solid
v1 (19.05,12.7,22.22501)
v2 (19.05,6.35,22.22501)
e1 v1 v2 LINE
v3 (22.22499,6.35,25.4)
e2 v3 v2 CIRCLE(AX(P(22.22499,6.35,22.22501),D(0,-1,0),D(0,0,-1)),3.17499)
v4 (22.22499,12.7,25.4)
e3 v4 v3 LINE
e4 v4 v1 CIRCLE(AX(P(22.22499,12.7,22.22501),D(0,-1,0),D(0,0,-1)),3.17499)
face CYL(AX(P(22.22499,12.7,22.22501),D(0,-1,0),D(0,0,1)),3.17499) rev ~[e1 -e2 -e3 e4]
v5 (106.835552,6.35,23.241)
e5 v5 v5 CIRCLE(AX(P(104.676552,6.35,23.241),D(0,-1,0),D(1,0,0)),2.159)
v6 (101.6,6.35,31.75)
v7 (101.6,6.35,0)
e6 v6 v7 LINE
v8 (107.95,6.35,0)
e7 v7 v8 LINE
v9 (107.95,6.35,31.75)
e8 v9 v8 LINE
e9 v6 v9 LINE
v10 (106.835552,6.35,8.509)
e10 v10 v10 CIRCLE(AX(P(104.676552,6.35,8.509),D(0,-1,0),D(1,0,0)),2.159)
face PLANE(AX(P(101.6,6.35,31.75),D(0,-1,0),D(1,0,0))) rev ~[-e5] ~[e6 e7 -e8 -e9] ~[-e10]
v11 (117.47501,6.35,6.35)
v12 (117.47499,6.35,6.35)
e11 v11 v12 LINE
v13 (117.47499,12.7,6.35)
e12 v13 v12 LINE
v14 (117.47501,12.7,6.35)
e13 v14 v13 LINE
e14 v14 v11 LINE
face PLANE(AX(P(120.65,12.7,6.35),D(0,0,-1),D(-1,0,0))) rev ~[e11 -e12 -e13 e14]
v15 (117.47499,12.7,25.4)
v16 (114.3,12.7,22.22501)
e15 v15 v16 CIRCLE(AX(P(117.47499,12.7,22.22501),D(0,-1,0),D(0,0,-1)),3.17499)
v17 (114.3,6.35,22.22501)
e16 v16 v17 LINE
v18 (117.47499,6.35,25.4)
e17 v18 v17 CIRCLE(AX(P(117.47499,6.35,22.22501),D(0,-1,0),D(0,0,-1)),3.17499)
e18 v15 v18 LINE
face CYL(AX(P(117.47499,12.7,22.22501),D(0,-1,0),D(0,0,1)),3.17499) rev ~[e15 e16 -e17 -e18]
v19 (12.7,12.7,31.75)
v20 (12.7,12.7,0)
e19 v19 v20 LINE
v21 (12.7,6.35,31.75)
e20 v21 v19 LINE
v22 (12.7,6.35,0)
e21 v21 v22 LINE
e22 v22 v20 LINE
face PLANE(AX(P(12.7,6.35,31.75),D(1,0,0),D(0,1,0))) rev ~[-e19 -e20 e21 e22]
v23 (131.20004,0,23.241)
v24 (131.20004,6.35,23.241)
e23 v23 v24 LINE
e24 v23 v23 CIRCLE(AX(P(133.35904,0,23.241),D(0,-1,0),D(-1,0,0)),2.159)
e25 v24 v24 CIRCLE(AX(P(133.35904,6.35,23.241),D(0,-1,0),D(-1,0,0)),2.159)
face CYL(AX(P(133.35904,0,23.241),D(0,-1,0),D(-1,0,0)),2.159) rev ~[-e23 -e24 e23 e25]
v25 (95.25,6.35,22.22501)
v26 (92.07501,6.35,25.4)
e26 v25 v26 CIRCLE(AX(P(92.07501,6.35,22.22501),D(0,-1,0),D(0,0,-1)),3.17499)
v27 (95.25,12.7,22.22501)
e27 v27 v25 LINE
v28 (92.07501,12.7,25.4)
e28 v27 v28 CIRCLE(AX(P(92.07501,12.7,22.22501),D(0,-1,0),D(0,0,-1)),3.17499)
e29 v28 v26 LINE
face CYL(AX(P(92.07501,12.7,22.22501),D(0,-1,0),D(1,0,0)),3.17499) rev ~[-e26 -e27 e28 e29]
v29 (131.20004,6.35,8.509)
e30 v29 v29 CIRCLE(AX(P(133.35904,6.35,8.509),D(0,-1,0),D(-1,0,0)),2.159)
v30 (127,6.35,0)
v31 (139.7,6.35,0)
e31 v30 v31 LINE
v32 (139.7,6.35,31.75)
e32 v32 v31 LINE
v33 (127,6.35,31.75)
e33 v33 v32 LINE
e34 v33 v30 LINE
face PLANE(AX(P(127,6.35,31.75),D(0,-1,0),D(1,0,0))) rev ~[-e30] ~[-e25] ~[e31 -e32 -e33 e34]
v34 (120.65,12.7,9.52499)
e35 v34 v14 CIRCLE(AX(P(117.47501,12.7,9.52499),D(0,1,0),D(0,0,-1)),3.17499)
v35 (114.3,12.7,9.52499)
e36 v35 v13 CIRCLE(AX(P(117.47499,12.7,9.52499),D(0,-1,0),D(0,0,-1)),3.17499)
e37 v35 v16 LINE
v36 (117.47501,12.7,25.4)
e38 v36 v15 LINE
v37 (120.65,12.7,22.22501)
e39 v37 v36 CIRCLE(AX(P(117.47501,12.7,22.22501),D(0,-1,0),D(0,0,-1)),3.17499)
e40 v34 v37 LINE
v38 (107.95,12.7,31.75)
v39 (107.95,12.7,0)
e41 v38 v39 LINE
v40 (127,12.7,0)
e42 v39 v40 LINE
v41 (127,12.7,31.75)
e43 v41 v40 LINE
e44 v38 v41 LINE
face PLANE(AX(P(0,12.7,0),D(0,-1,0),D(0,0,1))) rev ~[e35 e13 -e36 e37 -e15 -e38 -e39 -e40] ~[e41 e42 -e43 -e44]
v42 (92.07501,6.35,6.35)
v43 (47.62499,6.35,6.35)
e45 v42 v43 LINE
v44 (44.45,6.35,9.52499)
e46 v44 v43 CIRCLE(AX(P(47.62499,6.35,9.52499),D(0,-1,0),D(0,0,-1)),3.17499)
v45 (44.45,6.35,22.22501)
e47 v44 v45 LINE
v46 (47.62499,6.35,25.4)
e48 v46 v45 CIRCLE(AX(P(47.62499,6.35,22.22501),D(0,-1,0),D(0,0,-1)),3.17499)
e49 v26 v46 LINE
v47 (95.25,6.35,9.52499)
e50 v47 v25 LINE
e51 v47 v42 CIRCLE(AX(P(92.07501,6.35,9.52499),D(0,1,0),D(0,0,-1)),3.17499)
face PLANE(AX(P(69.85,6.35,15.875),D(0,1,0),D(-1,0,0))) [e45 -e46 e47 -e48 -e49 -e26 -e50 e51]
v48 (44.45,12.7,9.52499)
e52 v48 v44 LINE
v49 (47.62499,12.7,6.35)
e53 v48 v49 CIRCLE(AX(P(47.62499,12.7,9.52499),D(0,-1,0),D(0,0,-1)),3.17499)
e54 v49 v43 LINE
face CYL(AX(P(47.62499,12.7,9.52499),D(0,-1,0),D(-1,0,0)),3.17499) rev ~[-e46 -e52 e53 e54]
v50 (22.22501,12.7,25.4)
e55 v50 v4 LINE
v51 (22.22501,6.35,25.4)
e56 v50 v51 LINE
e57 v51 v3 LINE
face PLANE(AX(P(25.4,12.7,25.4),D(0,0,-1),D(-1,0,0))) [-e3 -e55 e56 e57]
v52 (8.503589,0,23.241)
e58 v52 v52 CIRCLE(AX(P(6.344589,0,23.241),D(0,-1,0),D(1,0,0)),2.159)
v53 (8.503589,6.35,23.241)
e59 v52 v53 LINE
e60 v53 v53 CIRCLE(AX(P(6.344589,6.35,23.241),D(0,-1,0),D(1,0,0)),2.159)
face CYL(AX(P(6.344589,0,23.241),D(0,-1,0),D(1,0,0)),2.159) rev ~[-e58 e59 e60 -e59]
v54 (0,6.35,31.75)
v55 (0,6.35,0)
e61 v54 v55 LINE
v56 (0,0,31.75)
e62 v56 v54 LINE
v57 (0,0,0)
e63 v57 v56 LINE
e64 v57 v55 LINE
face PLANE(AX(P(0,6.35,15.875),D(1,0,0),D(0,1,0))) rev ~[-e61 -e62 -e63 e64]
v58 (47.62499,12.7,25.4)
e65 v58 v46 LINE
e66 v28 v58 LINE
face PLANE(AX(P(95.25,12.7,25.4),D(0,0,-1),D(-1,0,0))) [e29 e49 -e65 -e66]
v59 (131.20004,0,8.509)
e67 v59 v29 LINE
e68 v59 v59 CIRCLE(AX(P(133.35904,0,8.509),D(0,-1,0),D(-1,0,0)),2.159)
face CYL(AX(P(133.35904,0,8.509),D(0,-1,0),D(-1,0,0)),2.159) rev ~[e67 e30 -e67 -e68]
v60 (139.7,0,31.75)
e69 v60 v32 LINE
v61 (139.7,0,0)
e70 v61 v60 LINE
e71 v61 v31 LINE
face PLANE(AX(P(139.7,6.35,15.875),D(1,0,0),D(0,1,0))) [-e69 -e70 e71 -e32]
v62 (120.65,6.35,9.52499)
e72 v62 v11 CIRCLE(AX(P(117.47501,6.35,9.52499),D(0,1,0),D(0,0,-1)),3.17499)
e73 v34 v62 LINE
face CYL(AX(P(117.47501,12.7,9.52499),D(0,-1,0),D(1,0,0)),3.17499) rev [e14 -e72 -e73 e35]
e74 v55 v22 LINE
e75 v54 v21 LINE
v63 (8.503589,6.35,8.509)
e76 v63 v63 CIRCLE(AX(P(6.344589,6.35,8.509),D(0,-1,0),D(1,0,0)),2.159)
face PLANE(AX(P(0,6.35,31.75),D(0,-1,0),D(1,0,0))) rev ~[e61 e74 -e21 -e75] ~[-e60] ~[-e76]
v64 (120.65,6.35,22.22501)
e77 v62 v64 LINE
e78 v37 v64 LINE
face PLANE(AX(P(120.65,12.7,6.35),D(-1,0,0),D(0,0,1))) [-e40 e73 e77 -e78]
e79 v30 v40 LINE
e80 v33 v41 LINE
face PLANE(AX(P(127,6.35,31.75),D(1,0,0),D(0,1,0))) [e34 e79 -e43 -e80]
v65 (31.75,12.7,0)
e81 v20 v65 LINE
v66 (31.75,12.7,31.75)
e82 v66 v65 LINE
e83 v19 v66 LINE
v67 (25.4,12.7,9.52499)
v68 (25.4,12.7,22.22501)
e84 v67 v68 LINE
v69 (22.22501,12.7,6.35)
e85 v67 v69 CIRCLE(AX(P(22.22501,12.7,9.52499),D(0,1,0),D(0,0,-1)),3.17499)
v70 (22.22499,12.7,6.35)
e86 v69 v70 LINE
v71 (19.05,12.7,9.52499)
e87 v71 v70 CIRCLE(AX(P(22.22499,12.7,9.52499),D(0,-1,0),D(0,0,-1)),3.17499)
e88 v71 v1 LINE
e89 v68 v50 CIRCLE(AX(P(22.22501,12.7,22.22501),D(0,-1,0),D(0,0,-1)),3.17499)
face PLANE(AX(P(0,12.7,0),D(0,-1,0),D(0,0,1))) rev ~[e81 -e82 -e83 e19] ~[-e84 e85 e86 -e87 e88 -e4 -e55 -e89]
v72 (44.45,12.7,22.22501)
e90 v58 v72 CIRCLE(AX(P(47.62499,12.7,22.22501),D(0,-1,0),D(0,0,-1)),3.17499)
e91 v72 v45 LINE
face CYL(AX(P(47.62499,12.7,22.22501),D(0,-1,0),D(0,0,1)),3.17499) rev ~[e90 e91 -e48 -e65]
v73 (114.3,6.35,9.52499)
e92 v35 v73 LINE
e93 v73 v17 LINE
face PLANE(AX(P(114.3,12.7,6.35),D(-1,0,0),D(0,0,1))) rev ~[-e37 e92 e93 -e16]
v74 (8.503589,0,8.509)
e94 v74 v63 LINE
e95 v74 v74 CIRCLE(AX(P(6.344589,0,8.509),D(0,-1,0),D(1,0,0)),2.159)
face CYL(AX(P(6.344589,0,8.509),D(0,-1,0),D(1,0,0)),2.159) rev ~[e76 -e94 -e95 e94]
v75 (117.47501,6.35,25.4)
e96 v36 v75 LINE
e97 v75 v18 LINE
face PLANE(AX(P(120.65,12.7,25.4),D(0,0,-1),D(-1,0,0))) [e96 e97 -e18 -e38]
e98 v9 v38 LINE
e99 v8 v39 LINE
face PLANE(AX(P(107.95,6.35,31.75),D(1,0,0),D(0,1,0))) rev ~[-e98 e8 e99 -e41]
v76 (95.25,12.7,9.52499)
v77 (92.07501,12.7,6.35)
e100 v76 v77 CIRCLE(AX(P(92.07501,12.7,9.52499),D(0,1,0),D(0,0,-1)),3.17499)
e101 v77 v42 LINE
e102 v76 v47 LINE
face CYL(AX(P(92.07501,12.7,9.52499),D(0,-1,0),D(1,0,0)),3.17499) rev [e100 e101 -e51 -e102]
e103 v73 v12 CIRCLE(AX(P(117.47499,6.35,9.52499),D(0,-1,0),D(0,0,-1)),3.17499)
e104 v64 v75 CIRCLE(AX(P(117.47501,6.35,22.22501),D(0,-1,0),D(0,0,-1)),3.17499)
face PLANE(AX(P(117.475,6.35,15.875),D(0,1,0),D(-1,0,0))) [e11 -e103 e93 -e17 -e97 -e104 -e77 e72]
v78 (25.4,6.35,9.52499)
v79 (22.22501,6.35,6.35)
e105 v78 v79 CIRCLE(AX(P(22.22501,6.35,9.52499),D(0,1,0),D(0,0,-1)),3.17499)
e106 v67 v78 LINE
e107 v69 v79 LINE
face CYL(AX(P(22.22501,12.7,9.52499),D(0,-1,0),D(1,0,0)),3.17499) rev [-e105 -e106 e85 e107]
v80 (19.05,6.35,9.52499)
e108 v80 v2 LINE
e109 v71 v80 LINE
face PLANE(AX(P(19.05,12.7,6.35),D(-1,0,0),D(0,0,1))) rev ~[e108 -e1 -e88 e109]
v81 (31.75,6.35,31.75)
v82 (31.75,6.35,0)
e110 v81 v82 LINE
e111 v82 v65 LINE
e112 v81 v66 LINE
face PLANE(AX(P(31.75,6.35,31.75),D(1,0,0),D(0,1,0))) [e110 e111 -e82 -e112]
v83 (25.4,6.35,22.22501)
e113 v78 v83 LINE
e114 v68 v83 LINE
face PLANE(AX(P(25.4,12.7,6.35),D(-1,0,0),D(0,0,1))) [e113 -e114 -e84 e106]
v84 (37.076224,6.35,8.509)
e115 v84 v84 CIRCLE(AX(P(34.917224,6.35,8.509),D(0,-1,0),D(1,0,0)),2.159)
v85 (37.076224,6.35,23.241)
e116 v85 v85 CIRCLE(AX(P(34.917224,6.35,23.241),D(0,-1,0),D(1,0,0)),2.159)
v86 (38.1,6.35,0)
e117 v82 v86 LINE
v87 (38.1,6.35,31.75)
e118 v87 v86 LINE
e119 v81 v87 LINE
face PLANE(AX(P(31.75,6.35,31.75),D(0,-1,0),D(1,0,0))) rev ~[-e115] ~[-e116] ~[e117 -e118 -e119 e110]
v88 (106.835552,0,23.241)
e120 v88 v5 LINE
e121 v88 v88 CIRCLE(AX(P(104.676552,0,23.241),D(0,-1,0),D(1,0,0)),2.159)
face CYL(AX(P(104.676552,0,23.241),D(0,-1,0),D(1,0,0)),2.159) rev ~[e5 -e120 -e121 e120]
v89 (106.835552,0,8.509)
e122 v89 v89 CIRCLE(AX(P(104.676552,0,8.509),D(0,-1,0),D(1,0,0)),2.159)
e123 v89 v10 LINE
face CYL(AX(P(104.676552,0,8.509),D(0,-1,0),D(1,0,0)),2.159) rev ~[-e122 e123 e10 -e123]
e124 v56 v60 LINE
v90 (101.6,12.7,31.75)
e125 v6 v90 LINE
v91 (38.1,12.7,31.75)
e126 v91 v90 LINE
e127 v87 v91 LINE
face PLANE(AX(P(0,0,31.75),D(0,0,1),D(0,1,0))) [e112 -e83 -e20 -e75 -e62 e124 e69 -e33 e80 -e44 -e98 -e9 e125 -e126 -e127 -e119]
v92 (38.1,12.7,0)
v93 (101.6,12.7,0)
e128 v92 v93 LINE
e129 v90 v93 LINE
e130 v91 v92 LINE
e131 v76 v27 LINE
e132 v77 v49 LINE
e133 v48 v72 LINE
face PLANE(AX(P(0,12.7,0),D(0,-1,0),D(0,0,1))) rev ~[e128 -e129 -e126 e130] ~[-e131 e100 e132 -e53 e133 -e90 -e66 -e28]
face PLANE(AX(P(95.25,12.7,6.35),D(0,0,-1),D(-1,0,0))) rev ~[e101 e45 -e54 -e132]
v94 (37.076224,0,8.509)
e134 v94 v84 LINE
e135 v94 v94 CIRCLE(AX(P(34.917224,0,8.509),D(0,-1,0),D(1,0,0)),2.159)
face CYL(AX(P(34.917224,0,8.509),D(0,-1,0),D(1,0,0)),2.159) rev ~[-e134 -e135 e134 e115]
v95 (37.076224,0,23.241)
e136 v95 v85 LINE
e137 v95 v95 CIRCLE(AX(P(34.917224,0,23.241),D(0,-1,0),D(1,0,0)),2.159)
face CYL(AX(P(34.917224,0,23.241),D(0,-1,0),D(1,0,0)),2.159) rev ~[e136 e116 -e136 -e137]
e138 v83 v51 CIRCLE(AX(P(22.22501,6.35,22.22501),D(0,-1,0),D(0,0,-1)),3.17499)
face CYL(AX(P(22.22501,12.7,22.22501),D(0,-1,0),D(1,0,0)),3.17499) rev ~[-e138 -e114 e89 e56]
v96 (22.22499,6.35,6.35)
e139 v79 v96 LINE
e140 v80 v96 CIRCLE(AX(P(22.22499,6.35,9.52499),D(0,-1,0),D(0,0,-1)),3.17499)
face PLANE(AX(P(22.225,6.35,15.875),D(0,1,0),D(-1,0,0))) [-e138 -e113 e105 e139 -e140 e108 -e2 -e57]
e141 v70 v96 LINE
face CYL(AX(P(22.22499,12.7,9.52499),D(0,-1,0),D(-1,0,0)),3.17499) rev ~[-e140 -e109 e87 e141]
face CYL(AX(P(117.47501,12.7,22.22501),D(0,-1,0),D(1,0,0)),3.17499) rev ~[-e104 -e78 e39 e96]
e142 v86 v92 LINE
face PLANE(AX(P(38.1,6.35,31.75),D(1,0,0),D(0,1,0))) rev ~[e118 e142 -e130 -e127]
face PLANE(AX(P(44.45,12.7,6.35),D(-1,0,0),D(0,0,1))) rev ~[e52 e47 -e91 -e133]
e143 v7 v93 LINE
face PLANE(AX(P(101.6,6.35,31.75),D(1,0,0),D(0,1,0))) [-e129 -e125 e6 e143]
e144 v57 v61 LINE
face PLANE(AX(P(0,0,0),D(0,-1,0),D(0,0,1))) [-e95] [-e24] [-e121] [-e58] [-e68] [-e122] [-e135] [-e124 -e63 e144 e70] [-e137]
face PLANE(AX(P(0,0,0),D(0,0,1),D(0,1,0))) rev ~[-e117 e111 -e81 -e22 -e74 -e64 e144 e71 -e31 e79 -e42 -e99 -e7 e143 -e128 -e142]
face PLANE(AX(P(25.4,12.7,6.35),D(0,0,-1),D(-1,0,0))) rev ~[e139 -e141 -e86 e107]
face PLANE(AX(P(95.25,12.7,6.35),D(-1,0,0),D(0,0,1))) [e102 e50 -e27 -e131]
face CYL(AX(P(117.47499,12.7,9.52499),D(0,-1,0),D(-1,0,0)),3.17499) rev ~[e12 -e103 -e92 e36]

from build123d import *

# Parameters (mm, degrees)
F0_W      = 12.7
F0_H      = 31.75
F1_DEPTH  = 139.7
F2_W      = 12.7
F2_H      = 6.35
F2_W_2    = 6.35
F3_DEPTH  = 31.751
F4_R      = 2.159
F5_DEPTH  = 25.4
F6_R      = 2.159
F7_DEPTH  = 25.4
F8_W      = 50.8
F8_H      = 19.05
F9_DEPTH  = 6.35
F10_W     = 6.35
F10_H     = 19.05
F11_DEPTH = 6.35
F12_R     = 3.17499


# Not quite as in the source:
# - a fillet or chamfer is up to 0.001 mm smaller than in the source, because OpenCascade refuses the exact size


with BuildPart() as f1:
    # F0 (on Right) → F1 (new body)
    with BuildSketch(Plane.YZ):
        with Locations((6.35, 15.875)):
            Rectangle(F0_W, F0_H)
    extrude(amount=F1_DEPTH)

    # F2 (on face) → F3 (cut, through all)
    with BuildSketch(Plane.XY.offset(31.75)):
        with Locations((6.35, 9.525)):
            Rectangle(F2_W, F2_H)
        with Locations((34.925, 9.525)):
            Rectangle(F2_W_2, F2_H)
        with Locations((104.775, 9.525)):
            Rectangle(F2_W_2, F2_H)
        with Locations((133.35, 9.525)):
            Rectangle(F2_W, F2_H)
    extrude(amount=-F3_DEPTH, mode=Mode.SUBTRACT)

    # F4 (on face) → F5 (cut)
    with BuildSketch(Plane.XZ):
        with Locations((6.3445889391, 23.241)):
            Circle(F4_R)
        with Locations((6.3445889391, 8.509)):
            Circle(F4_R)
        with BuildLine():
            ThreePointArc((135.5180395808, 8.509), (133.3590395808, 10.668), (131.2000395808, 8.509))
            ThreePointArc((131.2000395808, 8.509), (133.3590395808, 6.35), (135.5180395808, 8.509))
        make_face()
        with BuildLine():
            ThreePointArc((135.5180395808, 23.241), (133.3590395808, 25.4), (131.2000395808, 23.241))
            ThreePointArc((131.2000395808, 23.241), (133.3590395808, 21.082), (135.5180395808, 23.241))
        make_face()
    extrude(amount=-F5_DEPTH, mode=Mode.SUBTRACT)

    # F6 (on face) → F7 (cut)
    with BuildSketch(Plane.XZ):
        with Locations((34.9172241986, 23.241)):
            Circle(F6_R)
        with Locations((34.9172241986, 8.509)):
            Circle(F6_R)
        with Locations((104.6765521169, 8.509)):
            Circle(F6_R)
        with Locations((104.6765521169, 23.241)):
            Circle(F6_R)
    extrude(amount=-F7_DEPTH, mode=Mode.SUBTRACT)

    # F8 (on face) → F9 (cut)
    with BuildSketch(Plane(origin=(0, 12.7, 0), x_dir=(-1, 0, 0), z_dir=(0, 1, 0))):
        with Locations((-69.85, 15.875)):
            Rectangle(F8_W, F8_H)
    extrude(amount=-F9_DEPTH, mode=Mode.SUBTRACT)

    # F10 (on face) → F11 (cut)
    with BuildSketch(Plane(origin=(0, 12.7, 0), x_dir=(-1, 0, 0), z_dir=(0, 1, 0))):
        with Locations((-22.225, 15.875)):
            Rectangle(F10_W, F10_H)
        with Locations((-117.475, 15.875)):
            Rectangle(F10_W, F10_H)
    extrude(amount=-F11_DEPTH, mode=Mode.SUBTRACT)

    # F12 (radius 3.175 in the source; OpenCascade refuses exactly that, so slightly less here)
    f12_edges = [f1.edges().sort_by_distance(p)[0] for p in [
        (19.05, 9.525, 6.35),
        (25.4, 9.525, 6.35),
        (19.05, 9.525, 25.4),
        (25.4, 9.525, 25.4),
        (44.45, 9.525, 6.35),
        (95.25, 9.525, 6.35),
        (95.25, 9.525, 25.4),
        (44.45, 9.525, 25.4),
        (120.65, 9.525, 6.35),
        (120.65, 9.525, 25.4),
        (114.3, 9.525, 25.4),
        (114.3, 9.525, 6.35),
    ]]
    fillet(f12_edges, radius=F12_R)


solid = f1.part
